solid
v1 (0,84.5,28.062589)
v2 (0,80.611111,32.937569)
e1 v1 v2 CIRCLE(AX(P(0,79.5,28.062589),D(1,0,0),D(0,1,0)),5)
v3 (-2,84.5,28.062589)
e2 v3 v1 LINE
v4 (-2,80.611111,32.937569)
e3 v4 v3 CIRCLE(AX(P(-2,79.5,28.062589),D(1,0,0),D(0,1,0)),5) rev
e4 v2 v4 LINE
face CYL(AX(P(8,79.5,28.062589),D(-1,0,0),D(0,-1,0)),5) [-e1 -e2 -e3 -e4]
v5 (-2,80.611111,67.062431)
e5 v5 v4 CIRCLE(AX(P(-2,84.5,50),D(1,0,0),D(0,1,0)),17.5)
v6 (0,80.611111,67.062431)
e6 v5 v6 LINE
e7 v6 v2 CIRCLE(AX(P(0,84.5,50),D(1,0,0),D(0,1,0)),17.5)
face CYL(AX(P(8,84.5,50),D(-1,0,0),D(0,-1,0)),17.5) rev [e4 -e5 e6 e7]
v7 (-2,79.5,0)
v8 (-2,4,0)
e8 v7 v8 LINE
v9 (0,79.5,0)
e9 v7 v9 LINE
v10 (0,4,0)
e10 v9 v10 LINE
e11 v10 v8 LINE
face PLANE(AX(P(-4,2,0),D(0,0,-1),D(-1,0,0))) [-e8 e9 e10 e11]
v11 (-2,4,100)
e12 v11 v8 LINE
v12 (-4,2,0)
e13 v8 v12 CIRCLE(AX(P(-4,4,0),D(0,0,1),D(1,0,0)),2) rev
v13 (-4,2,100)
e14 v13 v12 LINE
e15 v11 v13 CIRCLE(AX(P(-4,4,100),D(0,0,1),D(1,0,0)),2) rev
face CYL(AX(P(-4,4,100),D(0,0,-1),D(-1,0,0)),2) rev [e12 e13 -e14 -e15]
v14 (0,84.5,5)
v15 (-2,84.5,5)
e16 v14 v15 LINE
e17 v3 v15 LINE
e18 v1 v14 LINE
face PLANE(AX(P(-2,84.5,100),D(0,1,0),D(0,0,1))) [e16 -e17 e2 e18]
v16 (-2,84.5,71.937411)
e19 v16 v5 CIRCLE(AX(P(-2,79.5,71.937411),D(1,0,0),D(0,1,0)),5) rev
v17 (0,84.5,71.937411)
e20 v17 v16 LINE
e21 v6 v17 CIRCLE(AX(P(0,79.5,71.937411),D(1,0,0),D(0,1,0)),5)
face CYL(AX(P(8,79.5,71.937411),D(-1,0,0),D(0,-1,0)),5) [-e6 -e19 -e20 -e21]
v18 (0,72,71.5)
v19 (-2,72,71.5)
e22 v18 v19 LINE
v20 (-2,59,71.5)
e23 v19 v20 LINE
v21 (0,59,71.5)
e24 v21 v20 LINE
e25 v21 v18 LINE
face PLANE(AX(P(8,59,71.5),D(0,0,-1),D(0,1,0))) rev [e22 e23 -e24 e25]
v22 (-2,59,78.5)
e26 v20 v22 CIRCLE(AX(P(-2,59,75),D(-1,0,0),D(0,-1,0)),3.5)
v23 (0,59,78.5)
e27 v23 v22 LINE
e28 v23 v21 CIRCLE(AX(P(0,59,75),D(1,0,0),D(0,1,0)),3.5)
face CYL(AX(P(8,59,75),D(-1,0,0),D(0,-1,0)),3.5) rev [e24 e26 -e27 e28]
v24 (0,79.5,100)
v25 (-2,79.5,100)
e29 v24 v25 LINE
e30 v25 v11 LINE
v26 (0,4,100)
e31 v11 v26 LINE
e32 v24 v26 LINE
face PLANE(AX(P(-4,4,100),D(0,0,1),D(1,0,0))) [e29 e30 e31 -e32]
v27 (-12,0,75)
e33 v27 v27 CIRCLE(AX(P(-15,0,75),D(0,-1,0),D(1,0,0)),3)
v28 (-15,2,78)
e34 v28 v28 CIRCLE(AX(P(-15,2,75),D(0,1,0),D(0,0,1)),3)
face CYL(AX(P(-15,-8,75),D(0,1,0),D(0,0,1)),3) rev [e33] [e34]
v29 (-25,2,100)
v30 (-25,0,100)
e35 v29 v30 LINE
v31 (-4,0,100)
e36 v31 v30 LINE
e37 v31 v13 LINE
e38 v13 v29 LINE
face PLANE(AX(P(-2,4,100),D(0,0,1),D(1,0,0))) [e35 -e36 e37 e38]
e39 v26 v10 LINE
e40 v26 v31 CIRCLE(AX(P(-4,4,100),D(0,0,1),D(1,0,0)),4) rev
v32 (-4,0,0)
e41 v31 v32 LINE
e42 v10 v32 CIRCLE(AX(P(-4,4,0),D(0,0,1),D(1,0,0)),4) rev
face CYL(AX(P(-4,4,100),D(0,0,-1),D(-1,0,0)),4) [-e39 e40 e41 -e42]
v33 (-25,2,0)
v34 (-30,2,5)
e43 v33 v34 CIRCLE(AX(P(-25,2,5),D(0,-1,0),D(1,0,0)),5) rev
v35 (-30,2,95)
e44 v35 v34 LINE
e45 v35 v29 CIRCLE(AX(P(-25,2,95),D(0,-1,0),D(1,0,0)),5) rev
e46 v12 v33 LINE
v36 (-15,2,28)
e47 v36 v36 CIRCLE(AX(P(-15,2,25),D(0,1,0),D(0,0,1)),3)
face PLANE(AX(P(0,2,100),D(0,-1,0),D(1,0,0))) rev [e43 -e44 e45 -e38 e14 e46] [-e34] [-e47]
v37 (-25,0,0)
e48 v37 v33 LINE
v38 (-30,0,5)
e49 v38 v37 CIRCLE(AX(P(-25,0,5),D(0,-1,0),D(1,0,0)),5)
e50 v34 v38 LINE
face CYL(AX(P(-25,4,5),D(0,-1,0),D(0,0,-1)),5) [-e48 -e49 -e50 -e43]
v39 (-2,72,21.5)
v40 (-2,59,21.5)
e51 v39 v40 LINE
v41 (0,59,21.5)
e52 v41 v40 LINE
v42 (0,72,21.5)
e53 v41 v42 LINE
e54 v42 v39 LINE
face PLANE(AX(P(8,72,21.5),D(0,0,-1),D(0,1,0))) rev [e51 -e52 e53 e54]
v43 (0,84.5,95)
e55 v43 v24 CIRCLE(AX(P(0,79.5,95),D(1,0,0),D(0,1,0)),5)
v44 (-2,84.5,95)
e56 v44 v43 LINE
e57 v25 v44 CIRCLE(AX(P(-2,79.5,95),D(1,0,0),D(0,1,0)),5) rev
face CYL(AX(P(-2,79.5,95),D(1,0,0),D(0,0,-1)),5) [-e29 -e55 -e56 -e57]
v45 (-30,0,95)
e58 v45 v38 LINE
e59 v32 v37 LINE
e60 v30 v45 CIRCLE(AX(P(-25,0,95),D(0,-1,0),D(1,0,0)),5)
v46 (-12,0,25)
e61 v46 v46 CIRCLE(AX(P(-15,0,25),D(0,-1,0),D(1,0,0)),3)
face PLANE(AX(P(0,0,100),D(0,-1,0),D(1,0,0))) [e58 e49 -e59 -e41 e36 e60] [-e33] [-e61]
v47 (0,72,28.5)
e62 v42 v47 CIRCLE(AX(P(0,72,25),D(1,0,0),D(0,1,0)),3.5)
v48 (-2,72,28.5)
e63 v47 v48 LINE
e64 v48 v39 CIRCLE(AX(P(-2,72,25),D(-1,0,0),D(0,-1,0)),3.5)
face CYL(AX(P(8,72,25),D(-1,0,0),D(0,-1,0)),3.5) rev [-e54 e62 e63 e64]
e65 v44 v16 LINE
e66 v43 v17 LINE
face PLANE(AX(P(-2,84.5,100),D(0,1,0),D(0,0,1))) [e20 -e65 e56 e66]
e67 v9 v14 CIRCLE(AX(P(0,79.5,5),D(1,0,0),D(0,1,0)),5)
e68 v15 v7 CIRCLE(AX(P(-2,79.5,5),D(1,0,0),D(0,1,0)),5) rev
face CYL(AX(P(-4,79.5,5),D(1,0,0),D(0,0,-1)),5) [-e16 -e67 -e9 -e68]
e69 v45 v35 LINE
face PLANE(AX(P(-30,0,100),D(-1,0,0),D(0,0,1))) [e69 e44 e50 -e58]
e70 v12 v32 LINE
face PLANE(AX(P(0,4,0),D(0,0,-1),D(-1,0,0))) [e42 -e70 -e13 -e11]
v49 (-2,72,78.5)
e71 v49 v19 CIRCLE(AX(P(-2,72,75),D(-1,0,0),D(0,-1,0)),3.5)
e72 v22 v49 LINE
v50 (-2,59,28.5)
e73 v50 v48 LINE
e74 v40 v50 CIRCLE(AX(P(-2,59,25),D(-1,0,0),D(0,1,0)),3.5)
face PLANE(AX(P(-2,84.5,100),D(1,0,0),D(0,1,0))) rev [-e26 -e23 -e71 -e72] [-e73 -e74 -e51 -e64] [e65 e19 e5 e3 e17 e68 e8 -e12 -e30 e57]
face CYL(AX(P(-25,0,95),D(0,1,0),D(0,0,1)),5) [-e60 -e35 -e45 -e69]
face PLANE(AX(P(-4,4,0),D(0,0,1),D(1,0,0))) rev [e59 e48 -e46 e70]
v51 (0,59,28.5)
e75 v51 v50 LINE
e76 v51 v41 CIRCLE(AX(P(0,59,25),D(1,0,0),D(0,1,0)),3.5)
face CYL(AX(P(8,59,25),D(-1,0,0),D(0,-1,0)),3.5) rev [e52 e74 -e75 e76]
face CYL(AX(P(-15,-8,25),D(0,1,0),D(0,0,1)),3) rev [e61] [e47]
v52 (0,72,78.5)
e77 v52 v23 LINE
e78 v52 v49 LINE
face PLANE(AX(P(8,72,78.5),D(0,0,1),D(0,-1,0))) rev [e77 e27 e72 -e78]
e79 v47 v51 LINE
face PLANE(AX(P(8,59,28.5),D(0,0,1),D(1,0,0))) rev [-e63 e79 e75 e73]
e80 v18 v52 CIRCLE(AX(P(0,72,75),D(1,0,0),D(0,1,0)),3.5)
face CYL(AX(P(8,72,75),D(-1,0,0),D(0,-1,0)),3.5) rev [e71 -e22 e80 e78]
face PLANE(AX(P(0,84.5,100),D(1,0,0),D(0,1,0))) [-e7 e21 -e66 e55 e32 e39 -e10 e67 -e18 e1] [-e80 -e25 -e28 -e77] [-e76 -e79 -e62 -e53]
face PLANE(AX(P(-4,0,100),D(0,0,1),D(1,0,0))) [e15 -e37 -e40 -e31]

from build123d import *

# Parameters (mm, degrees)
BASE_FLANGE1_DEPTH = 100
SKETCH6_R          = 17.5
CUT_EXTRUDE1_DEPTH = 10
FILLET1_R          = 5
FILLET2_R          = 5
SKETCH7_R          = 3
CUT_EXTRUDE2_DEPTH = 10
CUT_EXTRUDE3_DEPTH = 10


# Sheet-metal steps are written as plain solids
with BuildPart() as part:
    # Sketch1 → Base-Flange1 (new body)
    with BuildSketch(Plane.XY):
        with BuildLine():
            Line((0, 84.5), (0, 4))
            ThreePointArc((0, 4), (-1.171572875, 1.171572875), (-4, 0))
            Line((-4, 0), (-30, 0))
            Line((-30, 0), (-30, 2))
            Line((-30, 2), (-4, 2))
            ThreePointArc((-4, 2), (-2.585786438, 2.585786438), (-2, 4))
            Line((-2, 4), (-2, 84.5))
            Line((-2, 84.5), (0, 84.5))
        make_face()
    extrude(amount=BASE_FLANGE1_DEPTH)

    # Sketch6 → Cut-Extrude1 (cut)
    with BuildSketch(Plane.ZY.offset(2)):
        with Locations((50, 84.5)):
            Circle(SKETCH6_R)
    extrude(amount=-CUT_EXTRUDE1_DEPTH, mode=Mode.SUBTRACT)

    # Fillet1
    fillet1_edges = [part.edges().sort_by_distance(p)[0] for p in [
        (-1, 84.5, 100),
        (-1, 84.5, 32.5),
        (-1, 84.5, 67.5),
        (-1, 84.5, 0),
    ]]
    fillet(fillet1_edges, radius=FILLET1_R)

    # Fillet2
    fillet2_edges = [part.edges().sort_by_distance(p)[0] for p in [
        (-30, 1, 100),
        (-30, 1, 0),
    ]]
    fillet(fillet2_edges, radius=FILLET2_R)

    # Sketch7 → Cut-Extrude2 (cut)
    with BuildSketch(Plane(origin=(0, 2, 0), x_dir=(1, 0, 0), z_dir=(0, 1, 0))):
        with Locations(Location((-15, -25, 0), (0, 0, 270))):
            Circle(SKETCH7_R)
        with Locations(Location((-15, -75, 0), (0, 0, 270))):
            Circle(SKETCH7_R)
    extrude(amount=-CUT_EXTRUDE2_DEPTH, mode=Mode.SUBTRACT)

    # Sketch8 → Cut-Extrude3 (cut)
    with BuildSketch(Plane.ZY.offset(2)):
        with BuildLine():
            Line((21.5, 72), (21.5, 59))
            ThreePointArc((21.5, 59), (25, 55.5), (28.5, 59))
            Line((28.5, 59), (28.5, 72))
            ThreePointArc((28.5, 72), (25, 75.5), (21.5, 72))
        make_face()
        with BuildLine():
            Line((78.5, 72), (78.5, 59))
            ThreePointArc((78.5, 59), (75, 55.5), (71.5, 59))
            Line((71.5, 59), (71.5, 72))
            ThreePointArc((71.5, 72), (75, 75.5), (78.5, 72))
        make_face()
    extrude(amount=-CUT_EXTRUDE3_DEPTH, mode=Mode.SUBTRACT)


solid = part.part
